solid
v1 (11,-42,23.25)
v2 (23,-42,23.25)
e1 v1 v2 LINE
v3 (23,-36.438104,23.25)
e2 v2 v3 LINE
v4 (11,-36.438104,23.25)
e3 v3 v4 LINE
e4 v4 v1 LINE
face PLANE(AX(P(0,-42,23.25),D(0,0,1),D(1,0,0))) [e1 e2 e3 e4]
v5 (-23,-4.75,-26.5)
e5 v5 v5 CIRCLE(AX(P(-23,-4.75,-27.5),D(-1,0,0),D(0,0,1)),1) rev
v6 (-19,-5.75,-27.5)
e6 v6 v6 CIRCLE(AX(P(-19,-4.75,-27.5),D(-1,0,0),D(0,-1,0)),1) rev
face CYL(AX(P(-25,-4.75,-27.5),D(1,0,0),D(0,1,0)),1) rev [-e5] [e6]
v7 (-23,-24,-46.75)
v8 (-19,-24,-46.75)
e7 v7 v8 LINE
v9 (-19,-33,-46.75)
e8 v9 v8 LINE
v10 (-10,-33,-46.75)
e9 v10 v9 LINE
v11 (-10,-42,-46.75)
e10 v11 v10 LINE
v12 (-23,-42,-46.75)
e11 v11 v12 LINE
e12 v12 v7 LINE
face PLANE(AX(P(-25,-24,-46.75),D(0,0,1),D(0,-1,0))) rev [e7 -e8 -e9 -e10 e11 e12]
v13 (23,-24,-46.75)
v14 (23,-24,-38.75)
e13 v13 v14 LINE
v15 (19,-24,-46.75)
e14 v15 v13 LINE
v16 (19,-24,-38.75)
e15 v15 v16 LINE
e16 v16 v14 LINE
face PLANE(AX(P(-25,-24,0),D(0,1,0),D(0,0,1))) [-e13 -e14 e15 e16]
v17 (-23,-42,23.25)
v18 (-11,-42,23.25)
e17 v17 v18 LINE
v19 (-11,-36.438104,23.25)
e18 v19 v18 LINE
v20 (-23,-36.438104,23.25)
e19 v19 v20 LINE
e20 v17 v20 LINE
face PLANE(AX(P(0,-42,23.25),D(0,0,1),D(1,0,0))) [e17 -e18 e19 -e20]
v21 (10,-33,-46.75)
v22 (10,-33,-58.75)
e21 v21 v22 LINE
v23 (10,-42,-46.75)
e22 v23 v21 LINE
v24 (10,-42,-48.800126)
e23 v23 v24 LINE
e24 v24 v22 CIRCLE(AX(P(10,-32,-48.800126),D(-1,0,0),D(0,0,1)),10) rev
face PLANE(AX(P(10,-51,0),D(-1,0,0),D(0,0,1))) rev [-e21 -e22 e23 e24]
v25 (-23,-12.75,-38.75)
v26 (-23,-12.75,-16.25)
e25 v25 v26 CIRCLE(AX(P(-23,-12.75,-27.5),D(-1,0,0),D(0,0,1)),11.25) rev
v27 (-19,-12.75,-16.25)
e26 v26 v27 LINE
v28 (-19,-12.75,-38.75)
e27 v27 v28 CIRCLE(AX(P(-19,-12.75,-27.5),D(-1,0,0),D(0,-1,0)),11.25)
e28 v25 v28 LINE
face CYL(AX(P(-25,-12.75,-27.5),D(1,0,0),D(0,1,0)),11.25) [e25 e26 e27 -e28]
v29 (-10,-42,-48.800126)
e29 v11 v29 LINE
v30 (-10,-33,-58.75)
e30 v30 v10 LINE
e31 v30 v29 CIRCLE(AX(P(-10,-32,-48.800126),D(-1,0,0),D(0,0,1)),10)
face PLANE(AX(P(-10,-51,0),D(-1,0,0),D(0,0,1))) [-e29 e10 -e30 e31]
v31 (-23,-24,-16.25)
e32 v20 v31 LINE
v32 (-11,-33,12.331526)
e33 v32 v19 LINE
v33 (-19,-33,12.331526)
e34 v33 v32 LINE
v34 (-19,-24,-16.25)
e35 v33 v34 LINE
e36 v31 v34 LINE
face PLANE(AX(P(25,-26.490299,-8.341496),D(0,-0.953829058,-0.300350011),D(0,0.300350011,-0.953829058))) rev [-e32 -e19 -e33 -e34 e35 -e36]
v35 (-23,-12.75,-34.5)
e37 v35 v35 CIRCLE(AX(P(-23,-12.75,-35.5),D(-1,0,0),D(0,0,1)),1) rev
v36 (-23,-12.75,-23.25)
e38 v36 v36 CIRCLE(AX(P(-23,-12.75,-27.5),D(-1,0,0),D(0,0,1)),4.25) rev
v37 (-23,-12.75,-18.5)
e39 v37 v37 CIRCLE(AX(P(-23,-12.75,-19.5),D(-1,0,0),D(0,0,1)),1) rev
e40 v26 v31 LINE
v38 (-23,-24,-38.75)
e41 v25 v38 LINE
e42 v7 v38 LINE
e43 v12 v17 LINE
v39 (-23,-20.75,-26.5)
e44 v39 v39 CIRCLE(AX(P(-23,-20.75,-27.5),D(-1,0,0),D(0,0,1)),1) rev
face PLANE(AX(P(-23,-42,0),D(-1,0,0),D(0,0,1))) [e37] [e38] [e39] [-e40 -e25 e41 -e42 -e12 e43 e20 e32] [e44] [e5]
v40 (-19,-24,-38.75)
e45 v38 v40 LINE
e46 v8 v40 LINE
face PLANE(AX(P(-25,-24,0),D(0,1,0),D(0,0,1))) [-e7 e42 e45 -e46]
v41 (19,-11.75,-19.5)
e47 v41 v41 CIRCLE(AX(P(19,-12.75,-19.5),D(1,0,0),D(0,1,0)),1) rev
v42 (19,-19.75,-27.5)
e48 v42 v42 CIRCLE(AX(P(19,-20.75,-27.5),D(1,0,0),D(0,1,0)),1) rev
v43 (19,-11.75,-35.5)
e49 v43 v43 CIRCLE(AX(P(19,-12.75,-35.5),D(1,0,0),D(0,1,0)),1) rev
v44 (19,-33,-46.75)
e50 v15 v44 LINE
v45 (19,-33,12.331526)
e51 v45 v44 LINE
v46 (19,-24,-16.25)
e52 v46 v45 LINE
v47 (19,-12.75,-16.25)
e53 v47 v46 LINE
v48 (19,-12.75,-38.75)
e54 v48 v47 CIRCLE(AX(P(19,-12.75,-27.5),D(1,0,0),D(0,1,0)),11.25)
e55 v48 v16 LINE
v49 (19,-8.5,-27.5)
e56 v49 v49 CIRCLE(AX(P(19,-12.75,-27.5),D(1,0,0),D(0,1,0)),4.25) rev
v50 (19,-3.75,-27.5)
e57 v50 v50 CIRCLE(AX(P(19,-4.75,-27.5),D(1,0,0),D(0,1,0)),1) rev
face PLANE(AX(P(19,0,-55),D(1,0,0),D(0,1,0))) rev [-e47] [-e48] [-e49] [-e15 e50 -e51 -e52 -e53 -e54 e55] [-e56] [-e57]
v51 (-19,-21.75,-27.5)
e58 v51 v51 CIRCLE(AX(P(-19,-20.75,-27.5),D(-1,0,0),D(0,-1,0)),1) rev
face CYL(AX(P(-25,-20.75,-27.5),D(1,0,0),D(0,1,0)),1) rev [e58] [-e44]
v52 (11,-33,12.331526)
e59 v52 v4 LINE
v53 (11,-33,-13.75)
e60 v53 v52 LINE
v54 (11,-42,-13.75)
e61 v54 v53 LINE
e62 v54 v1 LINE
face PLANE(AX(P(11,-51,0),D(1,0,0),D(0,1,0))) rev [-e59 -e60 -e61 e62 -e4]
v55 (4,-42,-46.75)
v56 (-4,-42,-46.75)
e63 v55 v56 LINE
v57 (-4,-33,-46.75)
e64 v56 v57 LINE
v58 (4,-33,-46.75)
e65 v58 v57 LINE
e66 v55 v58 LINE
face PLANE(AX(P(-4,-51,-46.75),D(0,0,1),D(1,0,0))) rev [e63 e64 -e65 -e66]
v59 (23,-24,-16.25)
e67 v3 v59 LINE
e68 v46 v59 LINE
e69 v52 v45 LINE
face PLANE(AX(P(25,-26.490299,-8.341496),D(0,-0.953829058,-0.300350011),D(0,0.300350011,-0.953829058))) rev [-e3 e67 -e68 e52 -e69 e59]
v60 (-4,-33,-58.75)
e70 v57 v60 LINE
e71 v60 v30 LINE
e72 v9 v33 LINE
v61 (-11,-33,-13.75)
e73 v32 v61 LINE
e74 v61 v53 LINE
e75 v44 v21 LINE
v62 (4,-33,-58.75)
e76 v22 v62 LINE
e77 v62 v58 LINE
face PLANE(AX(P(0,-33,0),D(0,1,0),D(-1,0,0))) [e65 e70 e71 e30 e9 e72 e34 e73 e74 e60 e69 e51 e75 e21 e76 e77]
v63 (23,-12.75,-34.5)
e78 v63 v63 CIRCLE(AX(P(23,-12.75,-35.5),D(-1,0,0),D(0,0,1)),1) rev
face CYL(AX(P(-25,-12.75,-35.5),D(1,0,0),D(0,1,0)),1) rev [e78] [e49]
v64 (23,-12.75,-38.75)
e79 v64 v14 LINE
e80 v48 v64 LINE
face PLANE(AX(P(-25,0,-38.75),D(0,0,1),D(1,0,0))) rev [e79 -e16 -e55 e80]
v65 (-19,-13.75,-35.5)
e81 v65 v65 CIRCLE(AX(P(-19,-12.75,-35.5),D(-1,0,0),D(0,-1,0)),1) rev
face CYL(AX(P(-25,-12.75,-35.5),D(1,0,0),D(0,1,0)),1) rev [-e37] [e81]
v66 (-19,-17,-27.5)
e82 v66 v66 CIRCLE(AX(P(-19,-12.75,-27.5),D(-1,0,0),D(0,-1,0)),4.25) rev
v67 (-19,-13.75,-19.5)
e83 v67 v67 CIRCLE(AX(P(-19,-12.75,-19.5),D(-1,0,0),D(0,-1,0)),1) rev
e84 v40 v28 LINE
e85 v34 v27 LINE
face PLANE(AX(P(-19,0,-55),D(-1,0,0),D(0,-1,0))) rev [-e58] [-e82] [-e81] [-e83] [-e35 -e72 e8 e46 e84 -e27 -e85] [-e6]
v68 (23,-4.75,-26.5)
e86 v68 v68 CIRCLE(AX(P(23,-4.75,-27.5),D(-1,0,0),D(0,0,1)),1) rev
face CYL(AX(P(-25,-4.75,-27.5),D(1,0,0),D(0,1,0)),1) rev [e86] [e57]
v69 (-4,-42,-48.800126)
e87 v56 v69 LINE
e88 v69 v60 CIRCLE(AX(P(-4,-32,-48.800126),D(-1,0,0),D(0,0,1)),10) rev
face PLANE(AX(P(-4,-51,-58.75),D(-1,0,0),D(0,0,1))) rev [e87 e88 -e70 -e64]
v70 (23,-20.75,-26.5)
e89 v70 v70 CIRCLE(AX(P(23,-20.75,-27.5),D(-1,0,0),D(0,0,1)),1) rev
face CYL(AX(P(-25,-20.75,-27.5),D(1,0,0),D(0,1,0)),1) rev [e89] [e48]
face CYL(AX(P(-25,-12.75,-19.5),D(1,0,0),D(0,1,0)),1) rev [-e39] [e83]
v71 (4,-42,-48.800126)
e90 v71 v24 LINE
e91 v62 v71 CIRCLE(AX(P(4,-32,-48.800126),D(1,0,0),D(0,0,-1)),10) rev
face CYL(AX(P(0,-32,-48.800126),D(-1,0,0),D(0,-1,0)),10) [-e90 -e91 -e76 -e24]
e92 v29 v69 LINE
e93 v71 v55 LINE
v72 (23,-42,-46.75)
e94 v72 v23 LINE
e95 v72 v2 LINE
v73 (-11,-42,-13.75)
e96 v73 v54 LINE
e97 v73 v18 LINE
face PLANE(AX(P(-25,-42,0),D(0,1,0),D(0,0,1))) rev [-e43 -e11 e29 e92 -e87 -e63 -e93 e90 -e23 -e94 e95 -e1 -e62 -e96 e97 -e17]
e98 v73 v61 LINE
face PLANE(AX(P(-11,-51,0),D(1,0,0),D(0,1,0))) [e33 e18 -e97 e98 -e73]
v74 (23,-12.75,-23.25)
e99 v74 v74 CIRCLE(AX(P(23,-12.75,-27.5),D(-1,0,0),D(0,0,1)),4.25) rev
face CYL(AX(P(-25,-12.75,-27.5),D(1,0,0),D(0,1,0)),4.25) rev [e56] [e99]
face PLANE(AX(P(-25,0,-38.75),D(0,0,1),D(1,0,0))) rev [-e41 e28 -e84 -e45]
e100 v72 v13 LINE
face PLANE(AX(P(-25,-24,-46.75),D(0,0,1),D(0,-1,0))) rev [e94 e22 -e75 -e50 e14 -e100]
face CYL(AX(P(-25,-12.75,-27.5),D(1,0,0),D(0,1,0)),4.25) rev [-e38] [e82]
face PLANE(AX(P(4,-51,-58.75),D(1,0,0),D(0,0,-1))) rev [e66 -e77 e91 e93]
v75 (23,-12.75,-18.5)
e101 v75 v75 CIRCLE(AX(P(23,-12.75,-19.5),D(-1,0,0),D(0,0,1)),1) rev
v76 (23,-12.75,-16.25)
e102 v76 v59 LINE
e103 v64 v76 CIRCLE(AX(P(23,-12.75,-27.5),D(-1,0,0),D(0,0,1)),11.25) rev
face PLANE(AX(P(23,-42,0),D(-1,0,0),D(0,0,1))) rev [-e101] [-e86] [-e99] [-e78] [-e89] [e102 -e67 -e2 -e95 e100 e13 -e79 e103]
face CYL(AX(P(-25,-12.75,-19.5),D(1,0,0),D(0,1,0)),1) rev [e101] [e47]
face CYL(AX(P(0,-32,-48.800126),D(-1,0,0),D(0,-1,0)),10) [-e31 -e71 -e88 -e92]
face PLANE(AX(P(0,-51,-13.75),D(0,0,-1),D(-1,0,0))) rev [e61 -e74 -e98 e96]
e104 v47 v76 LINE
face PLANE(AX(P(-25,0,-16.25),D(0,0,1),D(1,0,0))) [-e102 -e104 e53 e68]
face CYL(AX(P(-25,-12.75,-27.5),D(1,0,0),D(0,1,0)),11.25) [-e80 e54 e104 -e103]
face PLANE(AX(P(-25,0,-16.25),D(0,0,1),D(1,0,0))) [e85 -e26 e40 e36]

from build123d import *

# Parameters (mm, degrees)
SKETCH1_W                = 50
SKETCH1_H                = 170
BOSS_EXTRUDE1_DEPTH      = 55
SKETCH2_W                = 34
SKETCH2_H                = 27
CUT_EXTRUDE1_DEPTH       = 181.416185527
SKETCH3_W                = 10
SKETCH3_H                = 24
SKETCH3_R                = 4.25
SKETCH3_R_2              = 1
CUT_EXTRUDE2_DEPTH       = 186.539753153
SKETCH4_W                = 2
SKETCH4_H                = 24
CUT_EXTRUDE3_DEPTH       = 178.623196683
SKETCH5_W                = 6.25
SKETCH5_H                = 11.25
CUT_EXTRUDE4_DEPTH       = 186.539753153
SKETCH6_W                = 38
SKETCH6_H                = 10
CUT_EXTRUDE5_DEPTH       = 181.416185527
SKETCH8_W                = 13.25
SKETCH8_H                = 2.25
CUT_EXTRUDE7_DEPTH       = 186.539753153
SKETCH9_W                = 34
SKETCH9_H                = 35.25
CUT_EXTRUDE8_DEPTH       = 179.297679458
SKETCH11_W               = 13.25
SKETCH11_H               = 20.25
CUT_EXTRUDE9_DEPTH       = 184.480414486
SKETCH12_W               = 28.5
SKETCH12_H               = 15
BOSS_EXTRUDE2_DEPTH      = 8
SKETCH14_W               = 34
SKETCH14_H               = 15
SKETCH14_H_2             = 10.25
BOSS_EXTRUDE3_DEPTH      = 13.25
SKETCH16_R               = 4.5
SKETCH16_R_2             = 2.5
CUT_EXTRUDE13_DEPTH      = 8
SKETCH17_R               = 4.5
SKETCH17_W               = 55
SKETCH17_H               = 10.25
CUT_EXTRUDE15_DEPTH      = 175.384811552
SKETCH18_W               = 71.25
SKETCH18_H               = 27.5
SKETCH18_W_2             = 13.75
SKETCH18_W_3             = 16.25
BOSS_EXTRUDE4_DEPTH      = 50
SKETCH19_W               = 38
SKETCH19_H               = 7
CUT_EXTRUDE16_DEPTH      = 152.25227271
SKETCH20_W               = 57.5
SKETCH20_H               = 27.5
CUT_EXTRUDE17_DEPTH      = 102.137591923
CUT_EXTRUDE18_DEPTH      = 100.39221549
SKETCH22_W               = 82.5
SKETCH22_H               = 2.5
BOSS_EXTRUDE5_DEPTH      = 50
SKETCH24_W               = 22
SKETCH24_H               = 17
CUT_EXTRUDE19_DEPTH      = 101.710289941
SKETCH25_W               = 38
SKETCH25_H               = 38.136363636
CUT_EXTRUDE20_DEPTH      = 10
SKETCH27_W               = 38
SKETCH27_H               = 60.136363636
BOSS_EXTRUDE6_DEPTH      = 8.6
SKETCH29_W               = 38
SKETCH29_H               = 1.4
CUT_EXTRUDE21_DEPTH      = 85.601313414
BOSS_EXTRUDE7_DEPTH      = 50
SKETCH31_W               = 38
SKETCH31_H               = 17
CUT_EXTRUDE22_DEPTH      = 117.365802537
SKETCH32_W               = 100
SKETCH32_H               = 3
CUT_EXTRUDE23_DEPTH      = 101.710289941
SKETCH33_W               = 20
SKETCH33_H               = 10
SKETCH33_W_2             = 22
SKETCH33_H_2             = 45
CUT_EXTRUDE24_DEPTH      = 84.137311118
SKETCH34_W               = 8
SKETCH34_H               = 12
CUT_EXTRUDE25_DEPTH      = 76.0787087
BOSS_EXTRUDE8_DEPTH      = 8
SKETCH37_W               = 78
SKETCH37_H               = 9
SKETCH37_W_2             = 12
CUT_EXTRUDE27_DEPTH      = 93.48006542
FILLET1_R                = 10
CUT_EXTRUDE29_DEPTH      = 77.423572934
CUT_EXTRUDE29_DEPTH_BACK = 77.423572934
SKETCH38_W               = 2
SKETCH38_H               = 78
SKETCH38_W_2             = 46
SKETCH38_H_2             = 8


with BuildPart() as part:
    # Sketch1 → Boss-Extrude1 (new body)
    with BuildSketch(Plane.XY):
        with Locations((0, -85)):
            Rectangle(SKETCH1_W, SKETCH1_H)
    extrude(amount=-BOSS_EXTRUDE1_DEPTH)

    # Sketch2 → Cut-Extrude1 (cut, through all)
    with BuildSketch(Plane.XY):
        with Locations((0, -13.5)):
            Rectangle(SKETCH2_W, SKETCH2_H)
    extrude(amount=-CUT_EXTRUDE1_DEPTH, mode=Mode.SUBTRACT)

    # Sketch3 → Cut-Extrude2 (cut, through all)
    with BuildSketch(Plane(origin=(25, 0, 0), x_dir=(0, 0, -1), z_dir=(1, 0, 0))):
        with Locations((50, -12)):
            Rectangle(SKETCH3_W, SKETCH3_H)
        with Locations((5, -12)):
            Rectangle(SKETCH3_W, SKETCH3_H)
        with Locations(Location((27.5, -12.75, 0), (0, 0, 90))):
            Circle(SKETCH3_R)
        with Locations(Location((35.5, -12.75, 0), (0, 0, 90))):
            Circle(SKETCH3_R_2)
        with Locations(Location((27.5, -4.75, 0), (0, 0, 90))):
            Circle(SKETCH3_R_2)
        with Locations(Location((27.5, -20.75, 0), (0, 0, 90))):
            Circle(SKETCH3_R_2)
        with Locations(Location((19.5, -12.75, 0), (0, 0, 90))):
            Circle(SKETCH3_R_2)
    extrude(amount=-CUT_EXTRUDE2_DEPTH, mode=Mode.SUBTRACT)

    # Sketch4 → Cut-Extrude3 (cut, through all)
    with BuildSketch(Plane.XY.offset(-10)):
        with Locations((-18, -12)):
            Rectangle(SKETCH4_W, SKETCH4_H)
        with Locations((18, -12)):
            Rectangle(SKETCH4_W, SKETCH4_H)
    extrude(amount=-CUT_EXTRUDE3_DEPTH, mode=Mode.SUBTRACT)

    # Sketch5 → Cut-Extrude4 (cut, through all)
    with BuildSketch(Plane(origin=(25, 0, 0), x_dir=(0, 0, -1), z_dir=(1, 0, 0))):
        with BuildLine():
            Line((45, 0), (10, 0))
            Line((10, 0), (10, -12.75))
            Line((10, -12.75), (16.25, -12.75))
            ThreePointArc((16.25, -12.75), (27.5, -1.5), (38.75, -12.75))
            Line((38.75, -12.75), (45, -12.75))
            Line((45, -12.75), (45, 0))
        make_face()
        with Locations((13.125, -18.375)):
            Rectangle(SKETCH5_W, SKETCH5_H)
        with Locations((41.875, -18.375)):
            Rectangle(SKETCH5_W, SKETCH5_H)
    extrude(amount=-CUT_EXTRUDE4_DEPTH, mode=Mode.SUBTRACT)

    # Sketch6 → Cut-Extrude5 (cut, through all)
    with BuildSketch(Plane.XY):
        with Locations((0, -29)):
            Rectangle(SKETCH6_W, SKETCH6_H)
    extrude(amount=-CUT_EXTRUDE5_DEPTH, mode=Mode.SUBTRACT)

    # Sketch8 → Cut-Extrude7 (cut, through all)
    with BuildSketch(Plane(origin=(25, 0, 0), x_dir=(0, 0, -1), z_dir=(1, 0, 0))):
        with BuildLine():
            Line((27.5, -157.5), (27.5, -132.5))
            Line((27.5, -132.5), (13.25, -132.5))
            Line((13.25, -132.5), (13.25, -167.75))
            Line((13.25, -167.75), (17.25, -167.75))
            ThreePointArc((17.25, -167.75), (20.252155493, -160.502155493), (27.5, -157.5))
        make_face()
        with BuildLine():
            Line((41.75, -167.75), (41.75, -132.5))
            Line((41.75, -132.5), (27.5, -132.5))
            Line((27.5, -132.5), (27.5, -157.5))
            ThreePointArc((27.5, -157.5), (34.747844507, -160.502155493), (37.75, -167.75))
            Line((37.75, -167.75), (41.75, -167.75))
        make_face()
        with Locations((48.375, -168.875)):
            Rectangle(SKETCH8_W, SKETCH8_H)
        with Locations((6.625, -168.875)):
            Rectangle(SKETCH8_W, SKETCH8_H)
        with BuildLine():
            Line((17.25, -167.75), (13.25, -167.75))
            Line((13.25, -167.75), (13.25, -170))
            Line((13.25, -170), (17.5, -170))
            ThreePointArc((17.5, -170), (17.31269172, -168.881923142), (17.25, -167.75))
        make_face()
        with BuildLine():
            Line((41.75, -170), (41.75, -167.75))
            Line((41.75, -167.75), (37.75, -167.75))
            ThreePointArc((37.75, -167.75), (37.68730828, -168.881923142), (37.5, -170))
            Line((37.5, -170), (41.75, -170))
        make_face()
        with BuildLine():
            Line((27.5, -167.75), (27.5, -157.5))
            ThreePointArc((27.5, -157.5), (20.252155493, -160.502155493), (17.25, -167.75))
            Line((17.25, -167.75), (27.5, -167.75))
        make_face()
        with BuildLine():
            ThreePointArc((37.75, -167.75), (34.747844507, -160.502155493), (27.5, -157.5))
            Line((27.5, -157.5), (27.5, -167.75))
            Line((27.5, -167.75), (37.75, -167.75))
        make_face()
        with BuildLine():
            Line((27.5, -170), (27.5, -167.75))
            Line((27.5, -167.75), (17.25, -167.75))
            ThreePointArc((17.25, -167.75), (17.31269172, -168.881923142), (17.5, -170))
            Line((17.5, -170), (27.5, -170))
        make_face()
        with BuildLine():
            ThreePointArc((37.5, -170), (37.68730828, -168.881923142), (37.75, -167.75))
            Line((37.75, -167.75), (27.5, -167.75))
            Line((27.5, -167.75), (27.5, -170))
            Line((27.5, -170), (37.5, -170))
        make_face()
    extrude(amount=-CUT_EXTRUDE7_DEPTH, mode=Mode.SUBTRACT)

    # Sketch9 → Cut-Extrude8 (cut, through all)
    with BuildSketch(Plane.XY):
        with Locations((0, -150.125)):
            Rectangle(SKETCH9_W, SKETCH9_H)
    extrude(amount=-CUT_EXTRUDE8_DEPTH, mode=Mode.SUBTRACT)

    # Sketch11 → Cut-Extrude9 (cut, through all)
    with BuildSketch(Plane(origin=(25, 0, 0), x_dir=(0, 0, -1), z_dir=(1, 0, 0))):
        with BuildLine():
            ThreePointArc((17.25, -167.75), (20.252155493, -160.502155493), (27.5, -157.5))
            Line((27.5, -157.5), (27.5, -147.5))
            Line((27.5, -147.5), (13.25, -147.5))
            Line((13.25, -147.5), (13.25, -167.75))
            Line((13.25, -167.75), (17.25, -167.75))
        make_face()
        with BuildLine():
            Line((27.5, -147.5), (27.5, -157.5))
            ThreePointArc((27.5, -157.5), (34.747844507, -160.502155493), (37.75, -167.75))
            Line((37.75, -167.75), (41.75, -167.75))
            Line((41.75, -167.75), (41.75, -147.5))
            Line((41.75, -147.5), (27.5, -147.5))
        make_face()
        with Locations((48.375, -157.625)):
            Rectangle(SKETCH11_W, SKETCH11_H)
        with Locations((6.625, -157.625)):
            Rectangle(SKETCH11_W, SKETCH11_H)
    extrude(amount=-CUT_EXTRUDE9_DEPTH, mode=Mode.SUBTRACT)

    # Sketch12 → Boss-Extrude2 (add)
    with BuildSketch(Plane(origin=(25, 0, 0), x_dir=(0, 0, -1), z_dir=(1, 0, 0))):
        with Locations((27.5, -140)):
            Rectangle(SKETCH12_W, SKETCH12_H)
    boss_extrude2 = extrude(amount=-BOSS_EXTRUDE2_DEPTH)

    # Mirror1: Boss-Extrude2 across plane
    add(boss_extrude2.mirror(Plane(origin=(0, 0, 0), x_dir=(0, 0, 1), z_dir=(1, 0, 0))))

    # Sketch14 → Boss-Extrude3 (add)
    with BuildSketch(Plane.XY):
        with Locations((0, -140)):
            Rectangle(SKETCH14_W, SKETCH14_H)
        with Locations((0, -152.625)):
            Rectangle(SKETCH14_W, SKETCH14_H_2)
    boss_extrude3 = extrude(amount=-BOSS_EXTRUDE3_DEPTH)

    # Mirror2: Boss-Extrude3 across plane
    add(boss_extrude3.mirror(Plane.XY.offset(-27.5)))

    # Sketch16 → Cut-Extrude13 (cut)
    # profile 1 of 3: a face of its own
    with BuildSketch(Plane(origin=(25, 0, 0), x_dir=(0, 0, -1), z_dir=(1, 0, 0))):
        with Locations(Location((16.5, -135.75, 0), (0, 0, 90))):
            Circle(SKETCH16_R)
        with Locations((16.5, -135.75)):
            Circle(SKETCH16_R_2, mode=Mode.SUBTRACT)
    # profile 2 of 3: a face of its own
    with BuildSketch(Plane(origin=(25, 0, 0), x_dir=(0, 0, -1), z_dir=(1, 0, 0))):
        with Locations((16.5, -135.75)):
            Circle(SKETCH16_R_2)
    # profile 3 of 3: a face of its own
    with BuildSketch(Plane(origin=(25, 0, 0), x_dir=(0, 0, -1), z_dir=(1, 0, 0))):
        with Locations(Location((38.5, -135.75, 0), (0, 0, 90))):
            Circle(SKETCH16_R)
    cut_extrude13 = extrude(amount=-CUT_EXTRUDE13_DEPTH, mode=Mode.SUBTRACT)

    # Mirror3: Cut-Extrude13 across plane
    add(cut_extrude13.mirror(Plane(origin=(0, 0, 0), x_dir=(0, 0, 1), z_dir=(1, 0, 0))), mode=Mode.SUBTRACT)

    # Sketch17 → Cut-Extrude15 (cut, through all)
    # profile 1 of 4: a face of its own
    with BuildSketch(Plane(origin=(25, 0, 0), x_dir=(0, 0, -1), z_dir=(1, 0, 0))):
        Polygon((55, -51.5), (27.5, -51.5), (0, -51.5), (0, -147.5), (55, -147.5), align=None)
        with Locations((16.5, -135.75)):
            Circle(SKETCH17_R, mode=Mode.SUBTRACT)
        with Locations((38.5, -135.75)):
            Circle(SKETCH17_R, mode=Mode.SUBTRACT)
    # profile 2 of 4: a face of its own
    with BuildSketch(Plane(origin=(25, 0, 0), x_dir=(0, 0, -1), z_dir=(1, 0, 0))):
        with Locations((27.5, -152.625)):
            Rectangle(SKETCH17_W, SKETCH17_H)
    # profile 3 of 4: a face of its own
    with BuildSketch(Plane(origin=(25, 0, 0), x_dir=(0, 0, -1), z_dir=(1, 0, 0))):
        with Locations((38.5, -135.75)):
            Circle(SKETCH17_R)
    # profile 4 of 4: a face of its own
    with BuildSketch(Plane(origin=(25, 0, 0), x_dir=(0, 0, -1), z_dir=(1, 0, 0))):
        with Locations((16.5, -135.75)):
            Circle(SKETCH17_R)
    extrude(amount=-CUT_EXTRUDE15_DEPTH, mode=Mode.SUBTRACT)

    # Sketch18 → Boss-Extrude4 (add)
    with BuildSketch(Plane(origin=(25, 0, 0), x_dir=(0, 0, -1), z_dir=(1, 0, 0))):
        with Locations((-35.625, -37.75)):
            Rectangle(SKETCH18_W, SKETCH18_H)
        with Locations((61.875, -37.75)):
            Rectangle(SKETCH18_W_2, SKETCH18_H)
        Polygon((38.75, -51.5), (38.75, -24), (16.25, -24), (0, -24), (0, -51.5), align=None)
        with Locations((46.875, -37.75)):
            Rectangle(SKETCH18_W_3, SKETCH18_H)
    extrude(amount=-BOSS_EXTRUDE4_DEPTH)

    # Sketch19 → Cut-Extrude16 (cut, through all)
    with BuildSketch(Plane.XY.offset(71.25)):
        with Locations((0, -27.5)):
            Rectangle(SKETCH19_W, SKETCH19_H)
    extrude(amount=-CUT_EXTRUDE16_DEPTH, mode=Mode.SUBTRACT)

    # Sketch20 → Cut-Extrude17 (cut, through all)
    with BuildSketch(Plane(origin=(25, 0, 0), x_dir=(0, 0, -1), z_dir=(1, 0, 0))):
        with Locations((-42.5, -37.75)):
            Rectangle(SKETCH20_W, SKETCH20_H)
    extrude(amount=-CUT_EXTRUDE17_DEPTH, mode=Mode.SUBTRACT)

    # Sketch21 → Cut-Extrude18 (cut, through all)
    with BuildSketch(Plane(origin=(25, 0, 0), x_dir=(0, 0, -1), z_dir=(1, 0, 0))):
        Polygon((16.25, -24), (-13.75, -51.5), (-13.75, -24), align=None)
    extrude(amount=-CUT_EXTRUDE18_DEPTH, mode=Mode.SUBTRACT)

    # Sketch22 → Boss-Extrude5 (add)
    with BuildSketch(Plane(origin=(25, 0, 0), x_dir=(0, 0, -1), z_dir=(1, 0, 0))):
        with Locations((27.5, -52.75)):
            Rectangle(SKETCH22_W, SKETCH22_H)
    extrude(amount=-BOSS_EXTRUDE5_DEPTH)

    # Sketch24 → Cut-Extrude19 (cut, through all)
    with BuildSketch(Plane(origin=(25, 0, 0), x_dir=(0, 0, -1), z_dir=(1, 0, 0))):
        with Locations((57.75, -32.5)):
            Rectangle(SKETCH24_W, SKETCH24_H)
    extrude(amount=-CUT_EXTRUDE19_DEPTH, mode=Mode.SUBTRACT)

    # Sketch25 → Cut-Extrude20 (cut)
    with BuildSketch(Plane(origin=(0, -31, 0), x_dir=(1, 0, 0), z_dir=(0, 1, 0))):
        with Locations((0, 27.681818182)):
            Rectangle(SKETCH25_W, SKETCH25_H)
    extrude(amount=-CUT_EXTRUDE20_DEPTH, mode=Mode.SUBTRACT)

    # Sketch27 → Boss-Extrude6 (add)
    with BuildSketch(Plane(origin=(0, -41, 0), x_dir=(1, 0, 0), z_dir=(0, 1, 0))):
        with Locations((0, 38.681818182)):
            Rectangle(SKETCH27_W, SKETCH27_H)
    extrude(amount=BOSS_EXTRUDE6_DEPTH)

    # Sketch29 → Cut-Extrude21 (cut, through all)
    with BuildSketch(Plane(origin=(0, 0, -8.613636364), x_dir=(-1, 0, 0), z_dir=(0, 0, -1))):
        with Locations((0, -31.7)):
            Rectangle(SKETCH29_W, SKETCH29_H)
    extrude(amount=-CUT_EXTRUDE21_DEPTH, mode=Mode.SUBTRACT)

    # Sketch30 → Boss-Extrude7 (add)
    with BuildSketch(Plane.ZY.offset(25)):
        Polygon((31.25, -38.957214173), (-16.25, -24), (-7.086363636, -32.4), (13.75, -51.5), (13.75, -53.914428346), (31.25, -53.914428346), align=None)
        Polygon((-16.25, -24), (-16.25, -32.4), (-7.086363636, -32.4), align=None)
    extrude(amount=-BOSS_EXTRUDE7_DEPTH)

    # Sketch31 → Cut-Extrude22 (cut, through all)
    with BuildSketch(Plane(origin=(0, 0, -68.75), x_dir=(-1, 0, 0), z_dir=(0, 0, -1))):
        with Locations((0, -32.5)):
            Rectangle(SKETCH31_W, SKETCH31_H)
    extrude(amount=-CUT_EXTRUDE22_DEPTH, mode=Mode.SUBTRACT)

    # Sketch32 → Cut-Extrude23 (cut, through all)
    with BuildSketch(Plane(origin=(25, 0, 0), x_dir=(0, 0, -1), z_dir=(1, 0, 0))):
        with Locations((18.75, -52.5)):
            Rectangle(SKETCH32_W, SKETCH32_H)
    extrude(amount=-CUT_EXTRUDE23_DEPTH, mode=Mode.SUBTRACT)

    # Sketch33 → Cut-Extrude24 (cut, through all)
    with BuildSketch(Plane(origin=(0, -41, 0), x_dir=(1, 0, 0), z_dir=(0, 1, 0))):
        Polygon((-10, 68.75), (-25, 68.75), (-25, 46.75), (-19, 46.75), (-10, 46.75), (-10, 58.75), align=None)
        Polygon((25, 68.75), (10, 68.75), (10, 58.75), (10, 46.75), (19, 46.75), (25, 46.75), align=None)
        with Locations((0, 63.75)):
            Rectangle(SKETCH33_W, SKETCH33_H)
        with Locations((0, -8.75)):
            Rectangle(SKETCH33_W_2, SKETCH33_H_2)
    extrude(amount=-CUT_EXTRUDE24_DEPTH, mode=Mode.SUBTRACT)

    # Sketch34 → Cut-Extrude25 (cut, through all)
    with BuildSketch(Plane(origin=(0, -41, 0), x_dir=(1, 0, 0), z_dir=(0, 1, 0))):
        with Locations((0, 52.75)):
            Rectangle(SKETCH34_W, SKETCH34_H)
    extrude(amount=-CUT_EXTRUDE25_DEPTH, mode=Mode.SUBTRACT)

    # Sketch36 → Boss-Extrude8 (add)
    with BuildSketch(Plane(origin=(0, -41, 0), x_dir=(1, 0, 0), z_dir=(0, 1, 0))):
        Polygon((4, 58.75), (4, 46.75), (-4, 46.75), (-4, 58.75), (-10, 58.75), (-10, 46.75), (-19, 46.75), (-19, -31.25), (-11, -31.25), (-11, 13.75), (11, 13.75), (11, -31.25), (19, -31.25), (19, 46.75), (10, 46.75), (10, 58.75), align=None)
    extrude(amount=BOSS_EXTRUDE8_DEPTH)

    # Sketch37 → Cut-Extrude27 (cut, through all)
    with BuildSketch(Plane(origin=(25, 0, 0), x_dir=(0, 0, -1), z_dir=(1, 0, 0))):
        with Locations((7.75, -46.5)):
            Rectangle(SKETCH37_W, SKETCH37_H)
        Polygon((-31.25, -33), (-31.25, -38.957214173), (-12.331525614, -33), align=None)
        with Locations((52.75, -46.5)):
            Rectangle(SKETCH37_W_2, SKETCH37_H)
    extrude(amount=-CUT_EXTRUDE27_DEPTH, mode=Mode.SUBTRACT)

    # Fillet1
    # the kernel refuses this fillet: 10 mm, written as the material it takes off along each edge
    with BuildSketch(Plane(origin=(20.874685928, -42, -58.75), x_dir=(0, 0, 1), z_dir=(-1, 0, 0)), Plane(origin=(34.874685928, -42, -58.75), x_dir=(0, 0, 1), z_dir=(-1, 0, 0))) as fillet1_piece_1:
        with BuildLine():
            CenterArc((9.949874371, 10), FILLET1_R, 185.739170477, 84.260829523)
            Line((0, 9), (-0.198997487, 8.98))
            ThreePointArc((-0.198997487, 8.98), (-0.2, 4.5), (-0.2, 0))
            Line((-0.2, 0), (0, -0.2))
            Line((0, -0.2), (9.949874371, -0.2))
            Line((9.949874371, -0.2), (9.949874371, 0))
        make_face()
    extrude(amount=55.749371855, mode=Mode.SUBTRACT)

    # Sketch38 → Cut-Extrude29 (cut, two sides: drawn at the far end of the back side and taken through both)
    with BuildSketch(Plane(origin=(0, 0, 0), x_dir=(1, 0, 0), z_dir=(0, 1, 0)).offset(-CUT_EXTRUDE29_DEPTH_BACK)):
        with Locations((-24, 7.75)):
            Rectangle(SKETCH38_W, SKETCH38_H)
        with Locations((24, 7.75)):
            Rectangle(SKETCH38_W, SKETCH38_H)
        with Locations((0, -27.25)):
            Rectangle(SKETCH38_W_2, SKETCH38_H_2)
    extrude(amount=CUT_EXTRUDE29_DEPTH + CUT_EXTRUDE29_DEPTH_BACK, mode=Mode.SUBTRACT)


solid = part.part
